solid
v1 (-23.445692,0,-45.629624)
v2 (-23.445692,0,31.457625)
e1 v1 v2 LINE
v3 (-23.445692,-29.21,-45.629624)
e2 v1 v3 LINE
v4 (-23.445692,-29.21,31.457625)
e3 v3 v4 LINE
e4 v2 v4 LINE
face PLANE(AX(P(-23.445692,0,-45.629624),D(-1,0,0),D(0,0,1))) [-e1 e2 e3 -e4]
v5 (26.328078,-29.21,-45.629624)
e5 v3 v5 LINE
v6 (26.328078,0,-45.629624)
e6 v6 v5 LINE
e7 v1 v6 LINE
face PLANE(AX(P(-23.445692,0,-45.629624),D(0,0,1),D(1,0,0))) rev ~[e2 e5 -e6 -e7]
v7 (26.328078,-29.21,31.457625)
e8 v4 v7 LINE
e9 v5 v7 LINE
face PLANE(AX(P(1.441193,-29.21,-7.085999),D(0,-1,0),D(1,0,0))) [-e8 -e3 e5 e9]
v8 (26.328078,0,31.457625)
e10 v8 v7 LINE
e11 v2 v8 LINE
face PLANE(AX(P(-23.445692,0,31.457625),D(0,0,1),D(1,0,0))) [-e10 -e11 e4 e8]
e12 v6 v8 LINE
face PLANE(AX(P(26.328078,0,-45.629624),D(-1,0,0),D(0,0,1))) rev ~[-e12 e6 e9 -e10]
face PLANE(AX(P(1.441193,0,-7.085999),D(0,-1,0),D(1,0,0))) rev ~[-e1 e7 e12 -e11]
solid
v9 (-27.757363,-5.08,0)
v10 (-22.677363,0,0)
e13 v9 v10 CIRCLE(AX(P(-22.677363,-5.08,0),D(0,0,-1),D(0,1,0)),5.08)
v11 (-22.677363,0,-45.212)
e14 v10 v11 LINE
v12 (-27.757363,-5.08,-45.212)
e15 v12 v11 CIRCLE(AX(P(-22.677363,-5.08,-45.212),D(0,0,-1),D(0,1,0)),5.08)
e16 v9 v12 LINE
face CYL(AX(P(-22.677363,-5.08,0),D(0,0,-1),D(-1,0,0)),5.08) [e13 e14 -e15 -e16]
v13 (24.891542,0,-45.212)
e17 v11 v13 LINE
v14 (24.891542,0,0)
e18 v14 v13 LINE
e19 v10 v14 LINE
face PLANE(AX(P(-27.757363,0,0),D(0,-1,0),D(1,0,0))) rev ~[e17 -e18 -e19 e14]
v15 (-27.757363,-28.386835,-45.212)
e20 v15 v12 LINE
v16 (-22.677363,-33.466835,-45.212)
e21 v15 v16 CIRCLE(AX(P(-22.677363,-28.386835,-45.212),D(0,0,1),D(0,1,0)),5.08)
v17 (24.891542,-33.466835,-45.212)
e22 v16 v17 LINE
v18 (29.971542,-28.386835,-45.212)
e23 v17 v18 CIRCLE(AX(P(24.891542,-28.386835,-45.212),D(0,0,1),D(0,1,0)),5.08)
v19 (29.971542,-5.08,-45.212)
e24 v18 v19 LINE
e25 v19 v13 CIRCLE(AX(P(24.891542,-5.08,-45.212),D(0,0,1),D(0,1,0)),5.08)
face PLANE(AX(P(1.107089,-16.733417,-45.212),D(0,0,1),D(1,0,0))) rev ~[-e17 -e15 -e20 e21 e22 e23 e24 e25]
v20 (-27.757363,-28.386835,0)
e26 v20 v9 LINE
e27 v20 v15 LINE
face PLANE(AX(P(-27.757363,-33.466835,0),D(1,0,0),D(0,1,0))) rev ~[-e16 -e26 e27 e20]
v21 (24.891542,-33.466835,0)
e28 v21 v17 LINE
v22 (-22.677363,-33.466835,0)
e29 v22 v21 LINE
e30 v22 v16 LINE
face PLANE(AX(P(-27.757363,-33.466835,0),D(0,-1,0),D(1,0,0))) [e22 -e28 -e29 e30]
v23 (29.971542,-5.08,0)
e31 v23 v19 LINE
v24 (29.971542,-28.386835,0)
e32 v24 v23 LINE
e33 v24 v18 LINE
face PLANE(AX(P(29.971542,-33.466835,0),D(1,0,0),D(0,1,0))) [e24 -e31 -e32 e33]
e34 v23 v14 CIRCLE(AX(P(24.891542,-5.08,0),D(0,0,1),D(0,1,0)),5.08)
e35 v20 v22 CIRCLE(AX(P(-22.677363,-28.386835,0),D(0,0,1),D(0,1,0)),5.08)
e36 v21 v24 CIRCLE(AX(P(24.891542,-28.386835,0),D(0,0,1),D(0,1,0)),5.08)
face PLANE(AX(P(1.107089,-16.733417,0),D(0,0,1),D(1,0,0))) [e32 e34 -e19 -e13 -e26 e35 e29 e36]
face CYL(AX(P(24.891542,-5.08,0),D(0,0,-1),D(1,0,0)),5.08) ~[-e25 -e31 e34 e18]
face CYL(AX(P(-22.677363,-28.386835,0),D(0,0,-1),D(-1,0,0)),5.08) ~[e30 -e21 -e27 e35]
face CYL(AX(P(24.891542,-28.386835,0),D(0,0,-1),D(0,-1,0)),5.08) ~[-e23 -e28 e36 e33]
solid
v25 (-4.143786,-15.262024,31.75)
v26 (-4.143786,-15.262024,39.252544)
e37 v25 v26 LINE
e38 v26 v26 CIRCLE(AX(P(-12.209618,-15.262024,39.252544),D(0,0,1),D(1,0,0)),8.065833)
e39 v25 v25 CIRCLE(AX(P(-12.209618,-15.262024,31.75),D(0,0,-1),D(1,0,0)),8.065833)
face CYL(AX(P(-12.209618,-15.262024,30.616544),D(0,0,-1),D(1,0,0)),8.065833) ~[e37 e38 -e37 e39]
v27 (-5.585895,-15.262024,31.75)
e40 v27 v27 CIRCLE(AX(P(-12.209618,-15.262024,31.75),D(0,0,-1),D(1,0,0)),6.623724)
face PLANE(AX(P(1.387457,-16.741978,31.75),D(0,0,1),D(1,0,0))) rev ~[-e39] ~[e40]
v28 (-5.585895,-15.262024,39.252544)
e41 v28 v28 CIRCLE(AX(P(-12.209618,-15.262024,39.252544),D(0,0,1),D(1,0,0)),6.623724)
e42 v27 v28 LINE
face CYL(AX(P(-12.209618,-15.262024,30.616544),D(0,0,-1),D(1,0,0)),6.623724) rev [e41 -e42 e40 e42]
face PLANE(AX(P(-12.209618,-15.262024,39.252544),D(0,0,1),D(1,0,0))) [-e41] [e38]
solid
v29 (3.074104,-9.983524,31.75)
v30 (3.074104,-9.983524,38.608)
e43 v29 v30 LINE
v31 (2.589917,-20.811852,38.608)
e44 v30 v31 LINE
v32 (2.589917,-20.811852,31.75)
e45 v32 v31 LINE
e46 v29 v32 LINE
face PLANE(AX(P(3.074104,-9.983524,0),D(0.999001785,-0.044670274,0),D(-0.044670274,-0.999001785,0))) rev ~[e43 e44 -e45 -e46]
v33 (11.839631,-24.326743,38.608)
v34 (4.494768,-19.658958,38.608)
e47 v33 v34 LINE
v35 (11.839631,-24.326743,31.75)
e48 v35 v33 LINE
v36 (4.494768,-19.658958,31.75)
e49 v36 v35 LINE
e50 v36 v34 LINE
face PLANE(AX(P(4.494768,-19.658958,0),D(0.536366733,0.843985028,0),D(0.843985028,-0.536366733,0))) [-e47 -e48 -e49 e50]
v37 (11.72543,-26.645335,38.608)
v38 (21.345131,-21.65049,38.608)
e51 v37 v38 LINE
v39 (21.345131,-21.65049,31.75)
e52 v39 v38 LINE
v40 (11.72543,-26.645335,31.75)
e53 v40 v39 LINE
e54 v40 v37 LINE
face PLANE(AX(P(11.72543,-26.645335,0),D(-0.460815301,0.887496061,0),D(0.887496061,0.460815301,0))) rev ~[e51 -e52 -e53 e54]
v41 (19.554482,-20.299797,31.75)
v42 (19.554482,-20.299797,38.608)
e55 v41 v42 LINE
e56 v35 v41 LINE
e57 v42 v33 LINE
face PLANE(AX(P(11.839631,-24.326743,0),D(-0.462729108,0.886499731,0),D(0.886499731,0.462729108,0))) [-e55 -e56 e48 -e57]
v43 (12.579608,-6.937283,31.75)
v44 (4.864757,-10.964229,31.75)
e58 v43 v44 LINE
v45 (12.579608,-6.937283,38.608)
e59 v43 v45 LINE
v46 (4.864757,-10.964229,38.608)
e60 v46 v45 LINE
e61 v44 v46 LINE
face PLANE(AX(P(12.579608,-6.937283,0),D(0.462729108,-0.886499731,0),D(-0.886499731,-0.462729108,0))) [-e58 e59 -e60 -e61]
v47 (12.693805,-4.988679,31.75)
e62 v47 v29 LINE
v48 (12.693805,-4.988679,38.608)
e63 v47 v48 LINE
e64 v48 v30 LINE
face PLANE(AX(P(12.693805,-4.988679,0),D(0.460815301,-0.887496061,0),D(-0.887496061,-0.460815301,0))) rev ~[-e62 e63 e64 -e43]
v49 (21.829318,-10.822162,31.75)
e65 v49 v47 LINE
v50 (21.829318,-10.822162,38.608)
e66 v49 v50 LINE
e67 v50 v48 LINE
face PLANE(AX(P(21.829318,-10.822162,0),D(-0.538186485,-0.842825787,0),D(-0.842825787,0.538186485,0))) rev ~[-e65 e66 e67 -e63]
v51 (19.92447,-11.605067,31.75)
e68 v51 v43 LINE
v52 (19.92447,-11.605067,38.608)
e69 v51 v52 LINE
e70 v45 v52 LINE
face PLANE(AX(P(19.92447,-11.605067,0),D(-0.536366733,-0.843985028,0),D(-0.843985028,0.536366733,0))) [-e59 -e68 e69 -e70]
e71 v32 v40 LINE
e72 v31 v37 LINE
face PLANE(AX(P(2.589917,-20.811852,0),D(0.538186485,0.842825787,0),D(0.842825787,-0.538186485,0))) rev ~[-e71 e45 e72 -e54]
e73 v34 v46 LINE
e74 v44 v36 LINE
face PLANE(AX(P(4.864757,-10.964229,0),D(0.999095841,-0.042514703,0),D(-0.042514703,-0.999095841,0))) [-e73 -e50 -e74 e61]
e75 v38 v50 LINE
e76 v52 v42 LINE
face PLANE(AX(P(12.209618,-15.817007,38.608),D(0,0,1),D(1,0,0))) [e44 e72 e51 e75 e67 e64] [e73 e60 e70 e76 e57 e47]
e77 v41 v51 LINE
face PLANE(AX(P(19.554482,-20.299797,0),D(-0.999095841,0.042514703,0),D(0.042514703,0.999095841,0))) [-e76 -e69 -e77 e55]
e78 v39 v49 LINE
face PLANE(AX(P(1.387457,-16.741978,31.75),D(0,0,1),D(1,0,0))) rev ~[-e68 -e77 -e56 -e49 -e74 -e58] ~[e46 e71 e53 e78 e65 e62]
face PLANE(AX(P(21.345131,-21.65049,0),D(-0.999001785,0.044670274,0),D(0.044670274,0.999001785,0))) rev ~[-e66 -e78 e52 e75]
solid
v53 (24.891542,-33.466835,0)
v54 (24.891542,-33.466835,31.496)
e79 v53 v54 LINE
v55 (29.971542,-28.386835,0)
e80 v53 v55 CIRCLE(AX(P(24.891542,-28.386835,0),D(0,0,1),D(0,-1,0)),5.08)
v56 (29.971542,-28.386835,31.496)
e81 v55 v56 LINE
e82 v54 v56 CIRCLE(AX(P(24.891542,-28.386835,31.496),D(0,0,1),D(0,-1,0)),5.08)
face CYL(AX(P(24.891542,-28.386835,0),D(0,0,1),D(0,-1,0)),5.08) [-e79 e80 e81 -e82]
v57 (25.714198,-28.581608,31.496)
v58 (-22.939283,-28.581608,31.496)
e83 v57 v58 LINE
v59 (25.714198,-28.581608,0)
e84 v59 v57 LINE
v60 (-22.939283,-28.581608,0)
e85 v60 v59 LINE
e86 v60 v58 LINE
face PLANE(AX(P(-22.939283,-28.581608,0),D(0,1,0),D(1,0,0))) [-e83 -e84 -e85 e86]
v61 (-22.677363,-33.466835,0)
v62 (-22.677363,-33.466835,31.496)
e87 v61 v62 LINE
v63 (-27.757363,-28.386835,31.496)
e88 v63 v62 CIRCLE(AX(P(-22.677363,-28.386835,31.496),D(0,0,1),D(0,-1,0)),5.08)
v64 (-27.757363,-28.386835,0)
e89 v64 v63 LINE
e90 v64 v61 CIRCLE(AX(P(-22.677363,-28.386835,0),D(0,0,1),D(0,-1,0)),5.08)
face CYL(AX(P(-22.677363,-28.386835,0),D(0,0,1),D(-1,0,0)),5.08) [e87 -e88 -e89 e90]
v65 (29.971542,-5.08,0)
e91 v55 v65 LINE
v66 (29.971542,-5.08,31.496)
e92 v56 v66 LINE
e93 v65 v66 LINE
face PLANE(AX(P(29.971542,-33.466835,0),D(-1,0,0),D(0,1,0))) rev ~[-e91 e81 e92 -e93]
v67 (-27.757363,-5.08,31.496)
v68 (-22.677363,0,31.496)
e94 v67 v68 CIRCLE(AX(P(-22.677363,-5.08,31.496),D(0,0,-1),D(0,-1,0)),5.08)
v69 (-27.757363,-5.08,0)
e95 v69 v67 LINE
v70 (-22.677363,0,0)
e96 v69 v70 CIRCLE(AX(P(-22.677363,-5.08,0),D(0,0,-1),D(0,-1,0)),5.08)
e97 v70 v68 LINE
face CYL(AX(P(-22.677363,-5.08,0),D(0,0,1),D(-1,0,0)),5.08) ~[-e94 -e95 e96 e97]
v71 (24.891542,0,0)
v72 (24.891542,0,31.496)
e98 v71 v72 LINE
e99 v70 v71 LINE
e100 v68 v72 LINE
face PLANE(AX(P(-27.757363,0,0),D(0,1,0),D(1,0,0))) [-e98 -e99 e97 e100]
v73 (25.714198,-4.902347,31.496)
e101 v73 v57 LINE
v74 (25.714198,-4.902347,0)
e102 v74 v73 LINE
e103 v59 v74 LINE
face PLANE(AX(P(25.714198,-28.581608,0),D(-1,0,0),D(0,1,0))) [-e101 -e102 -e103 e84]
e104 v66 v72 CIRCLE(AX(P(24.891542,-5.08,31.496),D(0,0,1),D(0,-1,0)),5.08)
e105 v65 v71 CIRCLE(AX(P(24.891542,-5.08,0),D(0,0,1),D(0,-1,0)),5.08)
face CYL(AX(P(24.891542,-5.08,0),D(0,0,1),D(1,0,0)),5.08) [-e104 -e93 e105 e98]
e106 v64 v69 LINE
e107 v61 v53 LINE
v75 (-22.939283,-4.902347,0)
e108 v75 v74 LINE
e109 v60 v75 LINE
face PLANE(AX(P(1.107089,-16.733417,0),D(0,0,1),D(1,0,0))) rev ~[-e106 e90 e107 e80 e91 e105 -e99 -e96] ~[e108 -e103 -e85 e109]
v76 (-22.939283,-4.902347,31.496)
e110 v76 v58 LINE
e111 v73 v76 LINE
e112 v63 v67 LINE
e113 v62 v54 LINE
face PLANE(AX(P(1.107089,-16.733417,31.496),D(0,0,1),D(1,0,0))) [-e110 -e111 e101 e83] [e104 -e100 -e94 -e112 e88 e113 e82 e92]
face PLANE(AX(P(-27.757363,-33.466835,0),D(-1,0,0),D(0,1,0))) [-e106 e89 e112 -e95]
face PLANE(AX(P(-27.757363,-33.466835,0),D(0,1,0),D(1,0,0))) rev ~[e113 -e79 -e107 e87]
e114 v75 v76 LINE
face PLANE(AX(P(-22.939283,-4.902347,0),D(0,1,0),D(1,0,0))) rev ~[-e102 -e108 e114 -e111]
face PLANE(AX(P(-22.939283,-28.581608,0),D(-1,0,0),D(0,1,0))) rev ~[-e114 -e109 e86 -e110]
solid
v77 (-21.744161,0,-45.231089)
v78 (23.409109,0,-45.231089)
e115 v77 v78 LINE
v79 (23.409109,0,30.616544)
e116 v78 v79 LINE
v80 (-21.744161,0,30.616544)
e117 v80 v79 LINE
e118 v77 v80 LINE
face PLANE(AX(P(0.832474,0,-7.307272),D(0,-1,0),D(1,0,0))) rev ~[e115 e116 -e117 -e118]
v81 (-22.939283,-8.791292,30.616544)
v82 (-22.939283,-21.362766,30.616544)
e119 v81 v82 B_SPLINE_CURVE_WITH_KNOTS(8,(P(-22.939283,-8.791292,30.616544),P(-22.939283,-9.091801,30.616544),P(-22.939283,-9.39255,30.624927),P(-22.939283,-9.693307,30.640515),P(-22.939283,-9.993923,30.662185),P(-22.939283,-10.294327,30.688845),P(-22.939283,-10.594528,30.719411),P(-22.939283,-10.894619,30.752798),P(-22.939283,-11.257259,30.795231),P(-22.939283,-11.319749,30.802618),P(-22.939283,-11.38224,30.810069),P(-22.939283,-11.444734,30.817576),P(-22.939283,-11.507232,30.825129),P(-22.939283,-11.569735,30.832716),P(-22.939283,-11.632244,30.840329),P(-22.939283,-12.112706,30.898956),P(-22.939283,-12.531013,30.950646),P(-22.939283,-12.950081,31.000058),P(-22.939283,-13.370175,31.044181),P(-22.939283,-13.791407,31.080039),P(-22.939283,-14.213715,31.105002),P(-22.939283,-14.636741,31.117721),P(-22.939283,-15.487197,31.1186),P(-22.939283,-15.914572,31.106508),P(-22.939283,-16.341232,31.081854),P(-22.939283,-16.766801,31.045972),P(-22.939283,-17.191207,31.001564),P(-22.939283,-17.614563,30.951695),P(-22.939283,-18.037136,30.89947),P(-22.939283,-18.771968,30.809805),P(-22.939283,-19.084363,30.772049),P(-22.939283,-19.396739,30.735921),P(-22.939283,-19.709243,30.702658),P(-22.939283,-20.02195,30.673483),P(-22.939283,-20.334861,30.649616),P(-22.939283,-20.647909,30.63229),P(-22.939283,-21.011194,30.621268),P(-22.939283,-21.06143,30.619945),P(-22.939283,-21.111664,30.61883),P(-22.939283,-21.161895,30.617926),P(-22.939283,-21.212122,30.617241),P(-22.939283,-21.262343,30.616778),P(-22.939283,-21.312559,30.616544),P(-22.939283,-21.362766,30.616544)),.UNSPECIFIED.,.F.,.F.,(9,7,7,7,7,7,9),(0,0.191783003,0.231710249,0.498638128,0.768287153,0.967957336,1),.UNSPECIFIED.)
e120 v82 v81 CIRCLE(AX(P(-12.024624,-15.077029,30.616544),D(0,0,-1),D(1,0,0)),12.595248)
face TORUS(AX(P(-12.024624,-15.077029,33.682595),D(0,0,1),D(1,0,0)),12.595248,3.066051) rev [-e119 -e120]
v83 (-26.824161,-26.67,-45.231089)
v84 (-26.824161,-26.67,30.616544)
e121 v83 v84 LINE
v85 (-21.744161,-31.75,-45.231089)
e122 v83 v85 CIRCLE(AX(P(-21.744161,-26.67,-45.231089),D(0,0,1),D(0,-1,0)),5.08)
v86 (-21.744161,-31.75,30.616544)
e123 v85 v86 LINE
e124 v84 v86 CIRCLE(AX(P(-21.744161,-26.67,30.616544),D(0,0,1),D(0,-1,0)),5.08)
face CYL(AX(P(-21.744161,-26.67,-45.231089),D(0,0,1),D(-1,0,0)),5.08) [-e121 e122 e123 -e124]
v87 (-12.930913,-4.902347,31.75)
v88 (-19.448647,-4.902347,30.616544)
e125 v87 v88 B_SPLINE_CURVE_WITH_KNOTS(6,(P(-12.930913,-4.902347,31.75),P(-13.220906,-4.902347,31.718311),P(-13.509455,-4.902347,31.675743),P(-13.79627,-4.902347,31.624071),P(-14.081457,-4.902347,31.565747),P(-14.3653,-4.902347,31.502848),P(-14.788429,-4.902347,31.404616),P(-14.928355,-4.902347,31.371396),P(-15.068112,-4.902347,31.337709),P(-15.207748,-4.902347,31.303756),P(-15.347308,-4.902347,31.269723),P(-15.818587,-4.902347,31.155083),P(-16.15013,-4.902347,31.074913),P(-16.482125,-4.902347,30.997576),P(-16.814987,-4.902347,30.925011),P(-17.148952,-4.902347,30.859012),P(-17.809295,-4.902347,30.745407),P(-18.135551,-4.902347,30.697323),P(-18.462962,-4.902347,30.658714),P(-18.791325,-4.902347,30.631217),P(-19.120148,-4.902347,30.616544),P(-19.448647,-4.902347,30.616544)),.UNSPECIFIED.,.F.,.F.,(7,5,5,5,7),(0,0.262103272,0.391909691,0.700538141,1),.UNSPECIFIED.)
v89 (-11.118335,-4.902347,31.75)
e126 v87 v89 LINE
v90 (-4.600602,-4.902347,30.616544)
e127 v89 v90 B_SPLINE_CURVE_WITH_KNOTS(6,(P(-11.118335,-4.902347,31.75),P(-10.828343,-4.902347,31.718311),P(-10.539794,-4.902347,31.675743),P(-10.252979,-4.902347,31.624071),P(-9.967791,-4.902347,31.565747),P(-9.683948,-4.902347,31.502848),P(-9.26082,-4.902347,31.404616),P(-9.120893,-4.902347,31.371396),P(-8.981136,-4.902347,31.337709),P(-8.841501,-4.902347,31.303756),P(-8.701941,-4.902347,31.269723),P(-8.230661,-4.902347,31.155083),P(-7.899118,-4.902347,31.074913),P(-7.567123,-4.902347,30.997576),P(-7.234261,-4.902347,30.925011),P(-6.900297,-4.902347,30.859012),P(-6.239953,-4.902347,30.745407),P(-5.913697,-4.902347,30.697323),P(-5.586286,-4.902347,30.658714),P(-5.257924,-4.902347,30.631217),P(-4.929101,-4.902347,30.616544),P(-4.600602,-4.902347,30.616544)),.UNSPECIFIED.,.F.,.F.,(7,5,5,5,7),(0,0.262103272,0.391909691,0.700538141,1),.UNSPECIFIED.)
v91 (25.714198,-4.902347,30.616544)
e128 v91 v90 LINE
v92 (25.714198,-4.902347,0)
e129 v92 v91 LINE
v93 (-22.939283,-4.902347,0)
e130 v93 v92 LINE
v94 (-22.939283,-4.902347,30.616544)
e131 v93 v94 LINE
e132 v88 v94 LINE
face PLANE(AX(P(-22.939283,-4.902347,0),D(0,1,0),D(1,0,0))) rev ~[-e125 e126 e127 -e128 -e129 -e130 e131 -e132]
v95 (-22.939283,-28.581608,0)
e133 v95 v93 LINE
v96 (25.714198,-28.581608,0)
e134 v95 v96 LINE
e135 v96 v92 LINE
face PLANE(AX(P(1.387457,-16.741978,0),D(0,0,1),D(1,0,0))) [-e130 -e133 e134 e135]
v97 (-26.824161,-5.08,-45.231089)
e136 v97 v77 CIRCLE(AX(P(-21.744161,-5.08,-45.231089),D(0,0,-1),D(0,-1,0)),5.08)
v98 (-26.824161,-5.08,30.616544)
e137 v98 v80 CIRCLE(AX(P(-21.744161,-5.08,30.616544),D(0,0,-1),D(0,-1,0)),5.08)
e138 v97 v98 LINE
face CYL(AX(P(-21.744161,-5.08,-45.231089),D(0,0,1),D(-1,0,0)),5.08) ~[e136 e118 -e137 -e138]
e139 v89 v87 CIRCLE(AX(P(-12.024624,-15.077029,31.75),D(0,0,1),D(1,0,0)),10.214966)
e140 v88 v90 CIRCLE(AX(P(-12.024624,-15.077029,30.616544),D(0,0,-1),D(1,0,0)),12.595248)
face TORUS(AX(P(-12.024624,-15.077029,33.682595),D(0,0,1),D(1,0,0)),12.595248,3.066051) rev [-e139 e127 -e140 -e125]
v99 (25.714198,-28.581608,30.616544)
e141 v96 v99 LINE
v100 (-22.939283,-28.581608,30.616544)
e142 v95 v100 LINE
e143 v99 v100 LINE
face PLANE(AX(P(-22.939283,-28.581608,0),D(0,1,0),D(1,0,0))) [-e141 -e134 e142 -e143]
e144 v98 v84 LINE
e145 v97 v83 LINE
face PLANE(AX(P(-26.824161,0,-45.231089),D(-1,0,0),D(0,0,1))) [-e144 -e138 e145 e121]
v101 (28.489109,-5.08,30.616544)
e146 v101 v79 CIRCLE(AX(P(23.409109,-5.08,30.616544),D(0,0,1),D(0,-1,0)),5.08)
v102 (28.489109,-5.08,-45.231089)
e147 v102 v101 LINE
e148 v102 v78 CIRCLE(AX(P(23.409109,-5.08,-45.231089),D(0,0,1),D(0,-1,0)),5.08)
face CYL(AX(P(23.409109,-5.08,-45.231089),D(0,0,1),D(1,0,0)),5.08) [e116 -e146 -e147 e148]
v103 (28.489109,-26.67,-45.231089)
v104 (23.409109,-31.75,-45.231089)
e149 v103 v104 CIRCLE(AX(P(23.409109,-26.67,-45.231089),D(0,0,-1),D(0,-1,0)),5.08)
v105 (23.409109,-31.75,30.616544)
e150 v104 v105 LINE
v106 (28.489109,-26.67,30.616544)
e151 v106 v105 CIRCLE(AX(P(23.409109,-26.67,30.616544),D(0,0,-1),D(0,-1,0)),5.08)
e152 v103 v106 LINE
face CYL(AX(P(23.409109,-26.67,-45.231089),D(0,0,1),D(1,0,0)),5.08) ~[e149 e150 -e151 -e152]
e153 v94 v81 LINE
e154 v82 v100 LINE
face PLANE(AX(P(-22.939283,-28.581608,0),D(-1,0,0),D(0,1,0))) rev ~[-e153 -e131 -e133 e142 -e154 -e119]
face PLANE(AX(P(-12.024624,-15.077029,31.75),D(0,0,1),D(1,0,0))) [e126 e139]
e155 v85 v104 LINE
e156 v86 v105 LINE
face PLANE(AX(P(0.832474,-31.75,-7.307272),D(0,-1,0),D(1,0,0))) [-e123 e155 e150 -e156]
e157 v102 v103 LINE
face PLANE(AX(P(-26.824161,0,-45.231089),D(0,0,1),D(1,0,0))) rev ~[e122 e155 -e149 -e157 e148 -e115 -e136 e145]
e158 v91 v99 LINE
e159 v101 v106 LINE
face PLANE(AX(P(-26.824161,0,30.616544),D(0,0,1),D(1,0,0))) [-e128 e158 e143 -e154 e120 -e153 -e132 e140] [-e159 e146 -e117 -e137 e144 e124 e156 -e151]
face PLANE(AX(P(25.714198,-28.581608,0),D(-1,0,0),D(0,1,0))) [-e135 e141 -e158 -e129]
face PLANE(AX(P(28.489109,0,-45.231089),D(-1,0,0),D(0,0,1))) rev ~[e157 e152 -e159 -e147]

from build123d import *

# Parameters (mm, degrees)
F0_W      = 55.313270539
F0_H      = 75.847633183
F1_DEPTH  = 31.75
F2_R      = 5.08
F3_R      = 8.0658325131
F3_R_2    = 6.6237237861
F4_DEPTH  = 8.636
F5_R      = 10.2149655363
F6_DEPTH  = 31.75
F9_DEPTH  = 38.608
F11_DEPTH = 38.862
F13_DEPTH = 27.94
F14_W     = 57.7289052308
F14_H     = 33.4668345749
F15_DEPTH = 31.496
F16_DEPTH = 45.212
F17_R     = 5.08
F17_2_R   = 5.08
F18_W     = 48.6534815282
F18_H     = 23.6792610958
F19_DEPTH = 31.75
F20_W     = 49.7737694532
F20_H     = 77.0872496068
F21_DEPTH = 29.21


# Not quite as in the source:
# - a fillet or chamfer that OpenCascade refuses, or shapes differently, is made with other operations: its cross-section is extruded or revolved along the edge and cut away or added


with BuildPart() as f1:
    # F0 (on Front) → F1 (new body)
    with BuildSketch(Plane.XZ):
        with Locations((0.8324738592, -7.3072724044)):
            Rectangle(F0_W, F0_H)
    extrude(amount=F1_DEPTH)

    # F2
    f2_edges = [f1.edges().sort_by_distance(p)[0] for p in [
        (28.489109, -31.75, -7.307272),
        (-26.824161, -31.75, -7.307272),
        (28.489109, 0, -7.307272),
        (-26.824161, 0, -7.307272),
    ]]
    fillet(f2_edges, radius=F2_R)



with BuildPart() as f4:
    # F3 (on face) → F4 (new body)
    with BuildSketch(Plane.XY.offset(30.6165441871)):
        with Locations((-12.2096184641, -15.2620235458)):
            Circle(F3_R)
        with Locations((-12.2096184641, -15.2620235458)):
            Circle(F3_R_2, mode=Mode.SUBTRACT)
    extrude(amount=F4_DEPTH)


with BuildPart() as f1_1:
    add(f1.part)

    add(f4.part)  # F6 merges F4
    # F5 (on Top) → F6 (join)
    with BuildSketch(Plane.XY):
        with Locations((-12.0246242732, -15.0770293549)):
            Circle(F5_R)
    extrude(amount=F6_DEPTH)

    # F7: fillet of radius 3.0660512242 on 1 edges, made by hand

    # F7_s1 → F7_t2 (revolve)
    with BuildSketch(Plane.XZ.offset(15.0770293549)):
        with BuildLine():
            ThreePointArc((-1.8096587369, 31.75), (-0.7475631061, 30.9143733613), (0.5706238273, 30.6165441871))
            Line((0.5706238273, 30.6165441871), (-1.8096587369, 30.6165441871))
            Line((-1.8096587369, 30.6165441871), (-1.8096587369, 31.75))
        make_face()
    revolve(axis=Axis((-12.0246242732, -15.0770293549, 30.6165441871), (0, 0, -1)))

    # F8 (on Top) → F9 (join)
    with BuildSketch(Plane.XY):
        Polygon((21.3451305674, -21.6504897434), (21.8293182552, -10.8221620321), (12.6938052206, -4.9886793386), (3.0741044982, -9.9835243564), (2.5899168104, -20.8118520677), (11.725429845, -26.6453347612), align=None)
    extrude(amount=F9_DEPTH)

    # F10 (on Top) → F11 (cut)
    with BuildSketch(Plane.XY):
        Polygon((19.9244704443, -11.6050673129), (12.5796077773, -6.9372830912), (4.8647567285, -10.9642286373), (4.4947683466, -19.6589584051), (11.8396310136, -24.3267426267), (19.5544820624, -20.2997970807), align=None)
    extrude(amount=F11_DEPTH, mode=Mode.SUBTRACT)

    # F12 (on Top) → F13 (join)
    with BuildSketch(Plane.XY):
        Polygon((19.2986911239, -20.0054645374), (19.7943821549, -11.7471329868), (12.8903027548, -7.1886861861), (5.4905323236, -10.8885709361), (4.9948412925, -19.1469024867), (11.8989206926, -23.7053492873), align=None)
    extrude(amount=F13_DEPTH)


with BuildPart() as f15:
    # F14 (on Top) → F15 (new body)
    with BuildSketch(Plane.XY):
        with Locations((1.1070892215, -16.7334172875)):
            Rectangle(F14_W, F14_H)
    extrude(amount=F15_DEPTH)

    # F17
    f17_edges = [f15.edges().sort_by_distance(p)[0] for p in [
        (29.971542, -33.466835, 15.748),
        (-27.757363, -33.466835, 15.748),
        (-27.757363, 0, 15.748),
        (29.971542, 0, 15.748),
    ]]
    fillet(f17_edges, radius=F17_R)


with BuildPart() as f16:
    # F14 (on Top) → F16 (new body)
    with BuildSketch(Plane.XY):
        with Locations((1.1070892215, -16.7334172875)):
            Rectangle(F14_W, F14_H)
    extrude(amount=-F16_DEPTH)

    # F17#2
    f17_2_edges = [f16.edges().sort_by_distance(p)[0] for p in [
        (29.971542, -33.466835, -22.606),
        (-27.757363, -33.466835, -22.606),
        (-27.757363, 0, -22.606),
        (29.971542, 0, -22.606),
    ]]
    fillet(f17_2_edges, radius=F17_2_R)


with BuildPart() as f19_tool:
    # F18 (on Top) → F19 (new body)
    with BuildSketch(Plane.XY):
        with Locations((1.3874573633, -16.7419775389)):
            Rectangle(F18_W, F18_H)
    extrude(amount=F19_DEPTH)


with BuildPart() as f1_2:
    add(f1_1.part)

    # F19: cut by f19_tool
    add(f19_tool.part, mode=Mode.SUBTRACT)


with BuildPart() as f15_1:
    add(f15.part)

    # F19: cut by f19_tool
    add(f19_tool.part, mode=Mode.SUBTRACT)


with BuildPart() as f21:
    # F20 (on Front) → F21 (new body)
    with BuildSketch(Plane.XZ):
        with Locations((1.4411928132, -7.0859994739)):
            Rectangle(F20_W, F20_H)
    extrude(amount=F21_DEPTH)


solid = Compound([f16.part, f1_2.part, f15_1.part, f21.part])
